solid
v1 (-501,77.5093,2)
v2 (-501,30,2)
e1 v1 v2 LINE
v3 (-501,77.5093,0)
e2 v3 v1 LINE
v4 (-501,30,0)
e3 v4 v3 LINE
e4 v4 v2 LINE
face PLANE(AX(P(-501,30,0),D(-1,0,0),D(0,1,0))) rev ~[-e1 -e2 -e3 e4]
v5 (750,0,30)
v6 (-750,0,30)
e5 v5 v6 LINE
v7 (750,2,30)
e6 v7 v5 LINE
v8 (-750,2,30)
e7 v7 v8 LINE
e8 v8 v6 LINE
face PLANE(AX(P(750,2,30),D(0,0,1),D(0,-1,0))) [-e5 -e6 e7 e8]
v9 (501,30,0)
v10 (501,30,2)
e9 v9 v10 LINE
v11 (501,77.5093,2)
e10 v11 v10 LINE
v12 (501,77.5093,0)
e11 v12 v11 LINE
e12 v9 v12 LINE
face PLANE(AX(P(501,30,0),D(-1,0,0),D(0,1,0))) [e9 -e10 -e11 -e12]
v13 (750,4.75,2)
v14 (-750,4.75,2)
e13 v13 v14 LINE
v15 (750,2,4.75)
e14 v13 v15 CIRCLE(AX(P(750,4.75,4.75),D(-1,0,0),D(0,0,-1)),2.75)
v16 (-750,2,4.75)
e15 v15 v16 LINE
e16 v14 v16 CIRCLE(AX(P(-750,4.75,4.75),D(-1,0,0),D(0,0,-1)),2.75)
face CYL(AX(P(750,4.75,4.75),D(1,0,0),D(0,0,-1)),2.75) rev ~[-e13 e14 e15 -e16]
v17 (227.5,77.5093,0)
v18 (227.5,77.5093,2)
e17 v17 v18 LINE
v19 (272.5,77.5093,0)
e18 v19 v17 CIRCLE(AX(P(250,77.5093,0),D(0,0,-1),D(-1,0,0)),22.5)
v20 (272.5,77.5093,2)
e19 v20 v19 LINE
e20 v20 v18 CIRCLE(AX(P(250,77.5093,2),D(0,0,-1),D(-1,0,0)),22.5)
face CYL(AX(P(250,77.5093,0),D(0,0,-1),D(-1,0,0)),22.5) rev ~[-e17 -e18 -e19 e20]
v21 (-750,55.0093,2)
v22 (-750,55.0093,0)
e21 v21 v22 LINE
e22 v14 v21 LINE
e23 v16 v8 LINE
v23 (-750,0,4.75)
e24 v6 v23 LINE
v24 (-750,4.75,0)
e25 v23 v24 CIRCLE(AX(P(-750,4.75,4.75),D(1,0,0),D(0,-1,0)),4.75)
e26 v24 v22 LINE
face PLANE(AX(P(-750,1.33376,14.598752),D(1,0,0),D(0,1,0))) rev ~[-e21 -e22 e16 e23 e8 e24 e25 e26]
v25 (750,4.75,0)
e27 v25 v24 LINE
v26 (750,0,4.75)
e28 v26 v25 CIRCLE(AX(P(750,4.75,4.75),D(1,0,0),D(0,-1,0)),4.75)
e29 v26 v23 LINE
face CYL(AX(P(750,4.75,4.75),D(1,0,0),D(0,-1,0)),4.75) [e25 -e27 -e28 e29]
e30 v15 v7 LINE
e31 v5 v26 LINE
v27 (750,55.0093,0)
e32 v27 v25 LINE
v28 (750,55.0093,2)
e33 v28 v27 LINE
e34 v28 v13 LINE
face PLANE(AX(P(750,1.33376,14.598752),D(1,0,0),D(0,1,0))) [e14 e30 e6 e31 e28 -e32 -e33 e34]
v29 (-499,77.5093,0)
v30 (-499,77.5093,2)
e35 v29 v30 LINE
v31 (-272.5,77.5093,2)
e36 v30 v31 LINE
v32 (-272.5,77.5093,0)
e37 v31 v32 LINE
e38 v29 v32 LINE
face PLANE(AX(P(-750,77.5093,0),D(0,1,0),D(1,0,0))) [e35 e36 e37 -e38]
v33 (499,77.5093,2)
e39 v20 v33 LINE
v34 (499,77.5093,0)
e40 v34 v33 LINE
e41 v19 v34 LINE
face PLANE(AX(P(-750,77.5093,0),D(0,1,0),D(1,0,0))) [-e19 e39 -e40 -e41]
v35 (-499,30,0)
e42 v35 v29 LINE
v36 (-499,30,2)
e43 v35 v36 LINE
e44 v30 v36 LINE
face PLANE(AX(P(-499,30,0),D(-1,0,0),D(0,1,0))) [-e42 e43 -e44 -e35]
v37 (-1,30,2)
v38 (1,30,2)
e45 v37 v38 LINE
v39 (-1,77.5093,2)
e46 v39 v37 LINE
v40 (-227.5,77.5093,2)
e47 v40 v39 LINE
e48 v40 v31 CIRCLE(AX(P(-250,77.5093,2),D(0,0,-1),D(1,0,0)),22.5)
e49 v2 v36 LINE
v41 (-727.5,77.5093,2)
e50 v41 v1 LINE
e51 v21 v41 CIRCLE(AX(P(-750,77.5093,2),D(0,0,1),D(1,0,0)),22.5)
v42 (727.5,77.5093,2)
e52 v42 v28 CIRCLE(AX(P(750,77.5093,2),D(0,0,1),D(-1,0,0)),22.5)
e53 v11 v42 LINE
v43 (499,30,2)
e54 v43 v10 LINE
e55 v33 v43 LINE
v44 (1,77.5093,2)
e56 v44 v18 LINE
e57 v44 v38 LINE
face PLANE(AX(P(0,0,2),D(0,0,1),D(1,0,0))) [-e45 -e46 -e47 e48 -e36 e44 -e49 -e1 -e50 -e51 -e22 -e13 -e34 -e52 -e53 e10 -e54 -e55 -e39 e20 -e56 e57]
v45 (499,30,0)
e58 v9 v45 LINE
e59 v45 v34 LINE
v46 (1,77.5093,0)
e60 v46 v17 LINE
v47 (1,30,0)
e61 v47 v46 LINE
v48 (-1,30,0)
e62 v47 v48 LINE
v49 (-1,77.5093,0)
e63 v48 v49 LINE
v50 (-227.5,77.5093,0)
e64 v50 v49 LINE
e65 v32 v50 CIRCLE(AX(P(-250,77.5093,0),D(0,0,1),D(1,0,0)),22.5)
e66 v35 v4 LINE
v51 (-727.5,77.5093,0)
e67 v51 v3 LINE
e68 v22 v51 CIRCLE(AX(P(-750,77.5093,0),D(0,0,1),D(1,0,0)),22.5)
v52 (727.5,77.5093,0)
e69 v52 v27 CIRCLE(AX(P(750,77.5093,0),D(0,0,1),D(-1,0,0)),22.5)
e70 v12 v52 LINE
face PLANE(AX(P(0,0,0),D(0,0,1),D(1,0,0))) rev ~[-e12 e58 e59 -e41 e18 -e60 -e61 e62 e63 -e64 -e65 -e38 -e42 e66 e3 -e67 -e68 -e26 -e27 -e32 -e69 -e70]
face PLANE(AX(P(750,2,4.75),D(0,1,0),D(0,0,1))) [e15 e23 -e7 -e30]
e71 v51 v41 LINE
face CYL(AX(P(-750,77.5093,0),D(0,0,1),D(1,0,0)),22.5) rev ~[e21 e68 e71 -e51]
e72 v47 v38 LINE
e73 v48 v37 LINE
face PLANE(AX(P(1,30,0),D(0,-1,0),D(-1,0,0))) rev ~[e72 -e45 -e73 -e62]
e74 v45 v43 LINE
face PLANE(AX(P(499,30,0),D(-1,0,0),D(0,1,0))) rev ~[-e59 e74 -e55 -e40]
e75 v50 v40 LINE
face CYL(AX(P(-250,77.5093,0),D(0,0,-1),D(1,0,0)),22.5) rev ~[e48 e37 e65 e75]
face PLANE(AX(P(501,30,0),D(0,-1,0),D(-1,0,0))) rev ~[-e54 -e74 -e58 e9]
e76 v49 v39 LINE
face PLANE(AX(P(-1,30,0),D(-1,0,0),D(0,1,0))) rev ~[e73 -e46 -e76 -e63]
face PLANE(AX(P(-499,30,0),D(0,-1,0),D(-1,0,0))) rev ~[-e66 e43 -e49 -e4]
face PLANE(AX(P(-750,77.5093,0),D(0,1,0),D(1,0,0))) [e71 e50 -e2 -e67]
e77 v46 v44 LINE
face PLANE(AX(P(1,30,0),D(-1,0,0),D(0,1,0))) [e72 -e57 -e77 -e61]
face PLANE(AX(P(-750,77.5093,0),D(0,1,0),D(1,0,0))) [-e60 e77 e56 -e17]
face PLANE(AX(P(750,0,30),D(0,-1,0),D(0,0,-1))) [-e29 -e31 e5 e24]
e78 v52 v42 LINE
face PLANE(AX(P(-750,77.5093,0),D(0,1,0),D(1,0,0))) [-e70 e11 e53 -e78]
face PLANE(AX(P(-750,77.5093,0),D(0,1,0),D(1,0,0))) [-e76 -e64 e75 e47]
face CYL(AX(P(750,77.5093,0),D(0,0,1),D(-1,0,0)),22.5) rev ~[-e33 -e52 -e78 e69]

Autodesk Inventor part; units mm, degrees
ref_plane "YZ Plane" through (0, 0, 0) normal (1, 0, 0) x (0, 1, 0)
ref_plane "XZ Plane" through (0, 0, 0) normal (0, 1, 0) x (-1, 0, 0)
ref_plane "XY Plane" through (0, 0, 0) normal (0, 0, 1) x (1, 0, 0)
sketch "Sketch1" plane through (0, 0, 0) normal (0, 0, 1) x (1, 0, 0)
  line L0 (-750, 77.5093) -> (750, 77.5093)
  line L1 (750, 77.5093) -> (750, 0)
  line L2 (750, 0) -> (-750, 0)
  line L3 (-750, 0) -> (-750, 77.5093)
  point P0 (0, 0)
  point P1 (0, 0)
  dimension "d0" = 1500
  dimension "d1" = 77.5093
extrude "Plate1" add sketch "Sketch1" along normal blind 2
sketch "Sketch2" plane through (750, 2, 0) normal (0, -1, 0) x (1, 0, 0)
  line L0 (-1500, 0) -> (0, 0)
  line L1 (0, 0) -> (0, 30)
  line L2 (0, 30) -> (-1500, 30)
  line L3 (-1500, 30) -> (-1500, 0)
edge flange "Flange1" height 30 angle 90 thickness 2 bend radius 2.75 thickness toward (0, -1, 0) relief round relief width 2 relief depth 1 edges at (0, 0, 2) wall of the first edge with corners at (-750, 2, 0) (750, 2, 0) (750, 2, 30) (-750, 2, 30)
bend "Bend1"
corner "Corner1"
sketch "Sketch5" plane through (0, 0, 0) normal (0, 0, -1) x (-1, 0, 0)
  line L0 (750, 77.5093) -> (-750, 77.5093) projected
  line L1 (-1, 30) -> (-1, 77.5093)
  line L2 (750, 0) -> (-750, 0) projected
  line L3 (-1, 30) -> (1, 30)
  line L4 (1, 30) -> (1, 77.5093)
  point P0 (0, 0)
  point P1 (0, 30)
  point P2 (0, 0)
  dimension "d27" = 2
  dimension "d28" = 30
extrude "Extrusion1" cut sketch "Sketch5" against normal through all
pattern_linear "Rectangular Pattern1" count 3 spacing 500 along (1, 0, 0) of "Extrusion1" first direction both ways yes
sketch "Sketch6" plane through (0, 0, 0) normal (0, 0, -1) x (-1, 0, 0)
  line L0 (-750, 77.5093) -> (-750, 4.75) projected
  circle A0 centre (-750, 77.5093) radius 22.5
  line L1 (-750, 77.5093) -> (750, 77.5093) projected
  line L2 (-1, 77.5093) -> (-1, 30) projected
  line L3 (-499, 77.5093) -> (-499, 30) projected
  line L4 (-1, 30) -> (-499, 30) construction
  circle A1 centre (-250, 77.5093) radius 22.5
  point P0 (0, 0)
  point P1 (-727.5, 77.5093)
  point P2 (-750, 55.0093)
  point P3 (-250, 30)
  dimension "d24" = 45
extrude "Extrusion2" cut sketch "Sketch6" along normal mid plane 30 contours L1 A0 L0 | A1 L1 | L1 A1 picked at (-748.3311, 62.6973)
mirror "Mirror1" about plane through (0, 0, 0) normal (1, 0, 0) of "Extrusion2"
sketch "Sketch7" plane through (0, 0, 2) normal (0, 0, 1) x (1, 0, 0)
  arc A0 (-750, 55.0093) -> (-727.5, 77.5093) centre (-750, 77.5093) ccw projected
  line L0 (-750, 4.75) -> (-750, 55.0093) projected
  line L1 (-750, 4.75) -> (750, 4.75) projected
  line L2 (750, 55.0093) -> (750, 4.75) projected
  arc A1 (727.5, 77.5093) -> (750, 55.0093) centre (750, 77.5093) ccw projected
  line L3 (501, 77.5093) -> (727.5, 77.5093) projected
  line L4 (501, 77.5093) -> (501, 30) projected
  line L5 (501, 30) -> (499, 30) projected
  line L6 (499, 30) -> (499, 77.5093) projected
  line L7 (1, 77.5093) -> (227.5, 77.5093) projected
  line L8 (1, 77.5093) -> (1, 30) projected
  line L9 (1, 30) -> (-1, 30) projected
  line L10 (-1, 30) -> (-1, 77.5093) projected
  line L11 (-499, 77.5093) -> (-272.5, 77.5093) projected
  line L12 (-499, 77.5093) -> (-499, 30) projected
  line L13 (-499, 30) -> (-501, 30) projected
  line L14 (-501, 30) -> (-501, 77.5093) projected
  line L15 (-727.5, 77.5093) -> (-501, 77.5093) projected
  line L16 (750, 4.75) -> (-750, 4.75) projected
  line L17 (650, 4.75) -> (650, 77.5093) construction
  line L18 (-750, 4.75) -> (750, 4.75) projected
  line L19 (646, 37.6655) -> (650, 44.5938)
  line L20 (650, 44.5938) -> (654, 37.6655)
  line L21 (654, 37.6655) -> (646, 37.6655)
  line L22 (650, 44.5938) -> (650, 37.6655) construction
  line L23 (626, 37.6655) -> (630, 44.5938)
  line L24 (630, 44.5938) -> (634, 37.6655)
  line L25 (634, 37.6655) -> (626, 37.6655)
  line L26 (630, 44.5938) -> (630, 37.6655) construction
  line L27 (272.5, 77.5093) -> (499, 77.5093) projected
  arc A2 (227.5, 77.5093) -> (272.5, 77.5093) centre (250, 77.5093) ccw projected
  line L28 (-227.5, 77.5093) -> (-1, 77.5093) projected
  arc A3 (-272.5, 77.5093) -> (-227.5, 77.5093) centre (-250, 77.5093) ccw projected
  point P0 (0, 0)
  point P1 (650, 41.1296)
  point P2 (630, 41.1296)
  dimension "d29" = 100
  dimension "d30" = 8
  dimension "d31" = 8
  dimension "d32" = 20
extrude "Extrusion3" [suppressed]
mirror "Mirror2" [suppressed]
sketch "Sketch8" plane through (0, 0, 2) normal (0, 0, 1) x (1, 0, 0)
  line L0 (496, 72.5093) -> (496, 60.5093) construction
  line L1 (496, 60.5093) -> (296, 60.5093) construction
  line L2 (296, 60.5093) -> (296, 72.5093) construction
  line L3 (296, 72.5093) -> (496, 72.5093) construction
  line L4 (501, 77.5093) -> (727.5, 77.5093) projected
  line L5 (272.5, 77.5093) -> (499, 77.5093) projected
  point P0 (0, 0)
  dimension "d35" = 200
  dimension "d36" = 12
  dimension "d39" = 3
  dimension "d40" = 5
mark "Mark1"
equation "\"d28\" = Стрингер_глубина_паза"
equation "\"d1\" = Стрингер_6"
equation "\"d27\" = d18"
equation "\"d18\" = Thickness"
equation "\"d2\" = Thickness"
equation "\"d3\" = BendReliefWidth"
equation "\"d4\" = BendReliefDepth"
equation "\"d5\" = MinimumRemnant"
equation "\"d6\" = TransitionRadius"
equation "\"d9\" = BendRadius"
equation "\"d10\" = CornerReliefSize"
equation "\"d11\" = GapSize"
equation "\"d12\" = JacobiRadiusSize"
equation "\"BendReliefWidth\" = Thickness"
equation "\"BendReliefDepth\" = 0.5 * Thickness"
equation "\"CornerReliefSize\" = 4 * Thickness"
equation "\"MinimumRemnant\" = 2 * Thickness"
equation "\"TransitionRadius\" = BendRadius"
equation "\"JacobiRadiusSize\" = BendRadius"
equation "\"GapSize\" = Thickness"
equation "\"Стрингер_6\" = 77.509299"
equation "\"Thickness\" = 2"
equation "\"BendRadius\" = 2.75"
equation "\"Стрингер_глубина_паза\" = 30"
properties part number "MSC 056 stringer board ####" material "Stainless Steel"
